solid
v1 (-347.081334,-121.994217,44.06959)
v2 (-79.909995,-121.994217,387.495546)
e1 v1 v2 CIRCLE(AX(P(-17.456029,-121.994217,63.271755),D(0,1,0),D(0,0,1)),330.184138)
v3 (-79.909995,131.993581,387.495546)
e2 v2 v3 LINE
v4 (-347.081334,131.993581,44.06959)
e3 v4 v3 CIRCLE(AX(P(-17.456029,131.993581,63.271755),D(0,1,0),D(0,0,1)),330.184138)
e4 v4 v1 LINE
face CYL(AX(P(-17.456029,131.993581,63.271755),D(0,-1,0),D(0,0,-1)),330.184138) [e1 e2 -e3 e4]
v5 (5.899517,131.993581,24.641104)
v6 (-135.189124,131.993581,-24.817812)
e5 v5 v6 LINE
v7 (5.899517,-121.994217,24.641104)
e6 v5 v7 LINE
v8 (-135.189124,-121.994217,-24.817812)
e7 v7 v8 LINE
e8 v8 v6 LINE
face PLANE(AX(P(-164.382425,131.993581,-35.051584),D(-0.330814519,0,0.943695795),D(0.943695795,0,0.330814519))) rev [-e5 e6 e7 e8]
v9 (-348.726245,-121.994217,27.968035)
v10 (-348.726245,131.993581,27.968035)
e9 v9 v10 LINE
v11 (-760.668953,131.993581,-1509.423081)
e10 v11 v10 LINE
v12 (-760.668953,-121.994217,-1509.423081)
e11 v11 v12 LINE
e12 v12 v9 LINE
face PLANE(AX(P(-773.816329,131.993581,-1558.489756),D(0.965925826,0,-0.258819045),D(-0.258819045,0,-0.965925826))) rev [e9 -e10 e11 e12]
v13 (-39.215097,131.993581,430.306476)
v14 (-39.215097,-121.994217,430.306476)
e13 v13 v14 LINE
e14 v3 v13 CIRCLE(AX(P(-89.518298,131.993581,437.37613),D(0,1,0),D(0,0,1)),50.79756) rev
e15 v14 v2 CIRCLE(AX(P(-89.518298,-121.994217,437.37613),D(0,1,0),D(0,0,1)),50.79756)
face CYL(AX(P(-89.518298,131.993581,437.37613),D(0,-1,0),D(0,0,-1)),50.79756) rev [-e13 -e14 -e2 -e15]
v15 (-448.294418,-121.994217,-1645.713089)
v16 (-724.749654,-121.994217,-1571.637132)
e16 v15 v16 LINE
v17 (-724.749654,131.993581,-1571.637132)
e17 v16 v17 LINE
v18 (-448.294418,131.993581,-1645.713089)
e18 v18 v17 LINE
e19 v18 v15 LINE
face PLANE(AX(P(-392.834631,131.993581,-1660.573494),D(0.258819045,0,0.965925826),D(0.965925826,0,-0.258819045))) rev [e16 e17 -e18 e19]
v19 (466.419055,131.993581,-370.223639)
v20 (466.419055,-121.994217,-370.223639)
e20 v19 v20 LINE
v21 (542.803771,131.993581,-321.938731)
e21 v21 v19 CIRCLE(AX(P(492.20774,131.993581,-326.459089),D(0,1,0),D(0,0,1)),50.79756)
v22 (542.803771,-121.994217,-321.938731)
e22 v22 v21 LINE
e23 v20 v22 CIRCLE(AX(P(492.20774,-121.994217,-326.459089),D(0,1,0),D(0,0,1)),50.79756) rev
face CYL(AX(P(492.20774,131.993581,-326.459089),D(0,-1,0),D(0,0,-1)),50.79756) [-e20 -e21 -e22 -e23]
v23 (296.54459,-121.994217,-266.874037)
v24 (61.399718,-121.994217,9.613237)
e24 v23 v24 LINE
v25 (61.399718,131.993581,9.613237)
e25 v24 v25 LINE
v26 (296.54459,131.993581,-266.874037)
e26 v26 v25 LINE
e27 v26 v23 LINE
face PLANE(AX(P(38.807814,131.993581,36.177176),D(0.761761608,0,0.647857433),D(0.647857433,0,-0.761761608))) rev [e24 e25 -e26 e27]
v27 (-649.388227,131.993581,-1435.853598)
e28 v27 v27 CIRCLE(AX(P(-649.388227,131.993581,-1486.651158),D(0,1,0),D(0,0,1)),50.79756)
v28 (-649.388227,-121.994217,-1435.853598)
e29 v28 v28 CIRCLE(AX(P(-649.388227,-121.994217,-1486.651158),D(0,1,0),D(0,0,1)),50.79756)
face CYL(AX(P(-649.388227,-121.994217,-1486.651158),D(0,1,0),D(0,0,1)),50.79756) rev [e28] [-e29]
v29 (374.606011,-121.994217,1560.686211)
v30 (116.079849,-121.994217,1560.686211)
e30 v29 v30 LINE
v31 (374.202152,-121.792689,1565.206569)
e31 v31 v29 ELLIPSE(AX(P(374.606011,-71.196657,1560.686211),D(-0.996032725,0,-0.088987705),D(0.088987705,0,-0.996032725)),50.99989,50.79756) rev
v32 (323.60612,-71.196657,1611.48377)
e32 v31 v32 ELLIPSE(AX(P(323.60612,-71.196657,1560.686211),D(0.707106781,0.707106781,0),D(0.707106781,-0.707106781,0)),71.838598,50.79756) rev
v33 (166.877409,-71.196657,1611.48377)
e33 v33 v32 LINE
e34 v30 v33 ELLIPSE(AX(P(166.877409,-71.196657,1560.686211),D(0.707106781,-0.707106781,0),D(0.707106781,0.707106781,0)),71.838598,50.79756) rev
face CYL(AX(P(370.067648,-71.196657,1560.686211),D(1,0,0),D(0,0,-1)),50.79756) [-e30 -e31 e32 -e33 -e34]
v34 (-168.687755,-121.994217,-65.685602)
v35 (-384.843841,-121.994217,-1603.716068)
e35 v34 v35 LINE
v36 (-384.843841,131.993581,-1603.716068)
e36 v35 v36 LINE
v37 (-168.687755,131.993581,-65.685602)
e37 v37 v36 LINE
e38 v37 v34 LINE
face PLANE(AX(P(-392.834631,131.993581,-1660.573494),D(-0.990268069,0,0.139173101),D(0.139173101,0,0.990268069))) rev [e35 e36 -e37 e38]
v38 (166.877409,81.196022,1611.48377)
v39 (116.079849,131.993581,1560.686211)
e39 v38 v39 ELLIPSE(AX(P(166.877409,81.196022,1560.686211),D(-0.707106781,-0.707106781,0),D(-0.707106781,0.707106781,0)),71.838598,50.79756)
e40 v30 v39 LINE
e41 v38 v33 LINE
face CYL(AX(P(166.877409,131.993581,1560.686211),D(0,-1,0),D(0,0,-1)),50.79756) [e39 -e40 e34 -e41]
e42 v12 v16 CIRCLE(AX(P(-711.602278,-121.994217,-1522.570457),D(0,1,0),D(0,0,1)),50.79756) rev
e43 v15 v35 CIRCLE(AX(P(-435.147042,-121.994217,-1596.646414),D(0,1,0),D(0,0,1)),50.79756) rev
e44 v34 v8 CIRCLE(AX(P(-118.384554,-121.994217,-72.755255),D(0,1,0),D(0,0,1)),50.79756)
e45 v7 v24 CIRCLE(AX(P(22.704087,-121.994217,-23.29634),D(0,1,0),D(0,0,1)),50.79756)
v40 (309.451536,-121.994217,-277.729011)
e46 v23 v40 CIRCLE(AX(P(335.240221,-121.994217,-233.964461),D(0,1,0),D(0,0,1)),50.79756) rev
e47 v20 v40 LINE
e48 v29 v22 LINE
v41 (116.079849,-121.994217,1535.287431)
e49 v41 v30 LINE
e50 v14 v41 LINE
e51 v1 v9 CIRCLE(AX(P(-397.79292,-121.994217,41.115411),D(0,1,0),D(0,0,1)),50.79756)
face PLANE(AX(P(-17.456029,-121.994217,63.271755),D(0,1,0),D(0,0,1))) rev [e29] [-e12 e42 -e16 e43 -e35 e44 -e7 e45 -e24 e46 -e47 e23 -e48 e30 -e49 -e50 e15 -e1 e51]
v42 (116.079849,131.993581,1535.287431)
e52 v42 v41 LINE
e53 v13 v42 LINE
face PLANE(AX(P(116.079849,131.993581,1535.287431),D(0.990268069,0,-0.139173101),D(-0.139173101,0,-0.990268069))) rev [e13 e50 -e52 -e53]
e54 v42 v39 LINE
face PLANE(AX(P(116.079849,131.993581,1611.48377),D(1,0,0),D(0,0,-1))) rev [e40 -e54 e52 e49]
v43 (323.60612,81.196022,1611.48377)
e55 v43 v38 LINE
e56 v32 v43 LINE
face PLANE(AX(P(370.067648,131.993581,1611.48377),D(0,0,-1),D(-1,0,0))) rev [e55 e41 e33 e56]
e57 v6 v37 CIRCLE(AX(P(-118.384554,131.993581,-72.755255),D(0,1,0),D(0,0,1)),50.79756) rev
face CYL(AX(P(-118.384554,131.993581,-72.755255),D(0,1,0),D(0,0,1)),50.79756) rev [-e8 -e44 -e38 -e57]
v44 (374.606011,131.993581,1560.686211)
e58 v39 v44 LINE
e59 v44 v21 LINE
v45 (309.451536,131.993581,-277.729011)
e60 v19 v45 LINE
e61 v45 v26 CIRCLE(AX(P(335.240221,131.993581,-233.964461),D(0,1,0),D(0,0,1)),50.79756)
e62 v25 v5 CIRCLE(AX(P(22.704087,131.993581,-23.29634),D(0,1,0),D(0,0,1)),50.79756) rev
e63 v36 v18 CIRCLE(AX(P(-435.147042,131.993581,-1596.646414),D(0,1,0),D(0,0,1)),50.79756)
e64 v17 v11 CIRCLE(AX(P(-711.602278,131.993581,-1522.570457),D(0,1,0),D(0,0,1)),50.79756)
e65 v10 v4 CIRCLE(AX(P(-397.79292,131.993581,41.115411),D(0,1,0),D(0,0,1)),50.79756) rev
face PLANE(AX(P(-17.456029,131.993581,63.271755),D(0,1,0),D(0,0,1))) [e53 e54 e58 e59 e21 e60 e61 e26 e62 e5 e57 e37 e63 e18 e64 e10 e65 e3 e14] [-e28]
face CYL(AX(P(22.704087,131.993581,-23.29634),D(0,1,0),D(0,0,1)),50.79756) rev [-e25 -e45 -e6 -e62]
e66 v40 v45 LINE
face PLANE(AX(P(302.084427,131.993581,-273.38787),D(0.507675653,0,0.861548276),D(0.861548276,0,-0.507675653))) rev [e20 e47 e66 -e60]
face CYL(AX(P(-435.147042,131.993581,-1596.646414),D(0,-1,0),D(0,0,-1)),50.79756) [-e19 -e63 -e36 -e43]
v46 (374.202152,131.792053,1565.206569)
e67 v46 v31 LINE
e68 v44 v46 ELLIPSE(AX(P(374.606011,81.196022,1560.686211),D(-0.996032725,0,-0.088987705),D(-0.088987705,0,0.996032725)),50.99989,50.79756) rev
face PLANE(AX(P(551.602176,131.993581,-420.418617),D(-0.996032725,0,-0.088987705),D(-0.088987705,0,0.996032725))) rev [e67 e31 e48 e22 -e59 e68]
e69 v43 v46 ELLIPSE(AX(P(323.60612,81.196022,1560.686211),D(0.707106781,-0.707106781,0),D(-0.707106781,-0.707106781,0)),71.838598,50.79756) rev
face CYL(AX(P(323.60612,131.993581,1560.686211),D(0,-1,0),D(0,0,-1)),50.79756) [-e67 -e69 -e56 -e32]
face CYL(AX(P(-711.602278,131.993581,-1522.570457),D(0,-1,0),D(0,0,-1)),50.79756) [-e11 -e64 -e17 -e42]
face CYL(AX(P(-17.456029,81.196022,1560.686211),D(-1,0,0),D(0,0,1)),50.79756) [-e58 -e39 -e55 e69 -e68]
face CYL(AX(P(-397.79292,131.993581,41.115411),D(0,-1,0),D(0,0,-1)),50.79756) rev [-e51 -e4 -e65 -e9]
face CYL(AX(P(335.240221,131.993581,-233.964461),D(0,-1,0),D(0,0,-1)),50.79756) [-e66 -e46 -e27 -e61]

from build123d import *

# Parameters (mm, degrees)
BOSS_EXTRUDE1_DEPTH = 10
SKETCH3_R           = 2
CUT_EXTRUDE1_DEPTH  = 115.049114878
FILLET1_R           = 2
SCALE1_OUTLINE_R    = 2
SCALE1_DEPTH        = 10
SCALE1_START        = -121.994217108
SCALE1_2_OUTLINE_R  = 50.797559682
SCALE1_2_DEPTH      = 253.987798408
SCALE1_START_2      = 115
SCALE1_3_DEPTH      = 259.606010788


with BuildPart() as part:
    # Sketch2 → Boss-Extrude1 (new body)
    with BuildSketch(Plane(origin=(0, 0, 0), x_dir=(1, 0, 0), z_dir=(0, 1, 0))):
        with BuildLine():
            Line((-34.878175659, 26.752034212), (-49.878175659, 22.732796325))
            Line((-49.878175659, 22.732796325), (-33.054937728, -40.052382384))
            ThreePointArc((-33.054937728, -40.052382384), (-30.014485308, -49.526217776), (-21.165547534, -54.075306501))
            Line((-21.165547534, -54.075306501), (-14.841209972, -99.075306501))
            Line((-14.841209972, -99.075306501), (-14.841209972, -102.075306501))
            Line((-14.841209972, -102.075306501), (-4.841209972, -102.075306501))
            Line((-4.841209972, -102.075306501), (2.306162059, -22.075306501))
            Line((2.306162059, -22.075306501), (-7.517843313, -27.864196663))
            Line((-7.517843313, -27.864196663), (-17.883562238, -40.052382384))
            Line((-17.883562238, -40.052382384), (-25.883562238, -37.247965788))
            Line((-25.883562238, -37.247965788), (-34.878175659, 26.752034212))
        make_face()
    extrude(amount=BOSS_EXTRUDE1_DEPTH)

    # Sketch3 → Cut-Extrude1 (cut, through all)
    with BuildSketch(Plane(origin=(0, 10, 0), x_dir=(1, 0, 0), z_dir=(0, 1, 0))):
        with Locations(Location((-44.979196174, 19.9043692, 0), (0, 0, 270))):
            Circle(SKETCH3_R)
    extrude(amount=-CUT_EXTRUDE1_DEPTH, mode=Mode.SUBTRACT)

    # Fillet1
    fillet1_edges = [part.edges().sort_by_distance(p)[0] for p in [
        (-9.841209972, 0, 102.075306501),
        (-25.883562238, 5, 37.247965788),
        (-17.883562238, 5, 40.052382384),
        (-7.517843313, 5, 27.864196663),
        (2.306162059, 5, 22.075306501),
        (-4.841209972, 5, 102.075306501),
        (-14.841209972, 5, 102.075306501),
        (-21.165547534, 5, 54.075306501),
        (-33.054937728, 5, 40.052382384),
        (-49.878175659, 5, -22.732796325),
        (-34.878175659, 5, -26.752034212),
        (-9.841209972, 10, 102.075306501),
    ]]
    fillet(fillet1_edges, radius=FILLET1_R)

    # Scale1: read off the stored shape, not the designer's step
    # Scale1 outline → Scale1 (cut)
    with BuildSketch(Plane(origin=(0, 0, 0), x_dir=(1, 0, 0), z_dir=(0, 1, 0))):
        with BuildLine():
            Line((-49.360537569, 20.800944672), (-41.650784025, -7.972247266))
            Line((-41.650784025, -7.972247266), (-29.394150026, -12.26883574))
            Line((-29.394150026, -12.26883574), (-34.56356251, 24.513445333))
            ThreePointArc((-34.56356251, 24.513445333), (-35.440224677, 25.902870776), (-37.061736738, 26.166950784))
            Line((-37.061736738, 26.166950784), (-47.946324007, 23.250434415))
            ThreePointArc((-47.946324007, 23.250434415), (-49.160736724, 22.318582762), (-49.360537569, 20.800944672))
        make_face()
        with Locations((-44.979196174, 19.9043692)):
            Circle(SCALE1_OUTLINE_R, mode=Mode.SUBTRACT)
    extrude(amount=SCALE1_DEPTH, mode=Mode.SUBTRACT)

    # Scale1 2 outline → Scale1 2 (add)
    with BuildSketch(Plane(origin=(0, 0, 0), x_dir=(1, 0, 0), z_dir=(0, 1, 0)).offset(SCALE1_START)):
        with BuildLine():
            Line((-168.687755361, 65.685601537), (-384.843840888, 1603.716067804))
            ThreePointArc((-384.843840888, 1603.716067804), (-407.109990259, 1639.005778716), (-448.294418101, 1645.713088711))
            Line((-448.294418101, 1645.713088711), (-724.74965381, 1571.637131559))
            ThreePointArc((-724.74965381, 1571.637131559), (-755.594255054, 1547.969236591), (-760.668952729, 1509.42308086))
            Line((-760.668952729, 1509.42308086), (-348.726244774, -27.968035036))
            ThreePointArc((-348.726244774, -27.968035036), (-347.258373754, -35.952877877), (-347.081334171, -44.069590112))
            ThreePointArc((-347.081334171, -44.069590112), (-278.064712008, -266.014644418), (-79.909995387, -387.4955464))
            ThreePointArc((-79.909995387, -387.4955464), (-52.700625622, -402.378257255), (-39.215096586, -430.306475817))
            Line((-39.215096586, -430.306475817), (116.079849164, -1535.287430848))
            Line((116.079849164, -1535.287430848), (116.079849164, -1560.686210689))
            ThreePointArc((116.079849164, -1560.686210689), (130.958109927, -1596.605509607), (166.877408846, -1611.48377037))
            Line((166.877408846, -1611.48377037), (323.606120492, -1611.48377037))
            ThreePointArc((323.606120492, -1611.48377037), (357.890000816, -1598.169641955), (374.202152259, -1565.206568967))
            Line((374.202152259, -1565.206568967), (542.803771441, 321.938731014))
            ThreePointArc((542.803771441, 321.938731014), (519.350127439, 369.397217524), (466.419055413, 370.223639258))
            Line((466.419055413, 370.223639258), (309.451536343, 277.729010804))
            ThreePointArc((309.451536343, 277.729010804), (302.544435993, 272.840902782), (296.544589882, 266.874037447))
            Line((296.544589882, 266.874037447), (61.399717742, -9.613236968))
            ThreePointArc((61.399717742, -9.613236968), (35.980525842, -25.735570803), (5.899516763, -24.641103846))
            Line((5.899516763, -24.641103846), (-135.189124295, 24.817811952))
            ThreePointArc((-135.189124295, 24.817811952), (-157.670776916, 40.553007666), (-168.687755361, 65.685601537))
        make_face()
        with Locations((-649.388227221, 1486.651157832)):
            Circle(SCALE1_2_OUTLINE_R, mode=Mode.SUBTRACT)
    extrude(amount=SCALE1_2_DEPTH)

    # Scale1 3 outline → Scale1 3 (cut)
    with BuildSketch(Plane.YZ.offset(SCALE1_START_2)):
        with BuildLine():
            Line((131.9935813, 1611.48377037), (81.196021618, 1611.48377037))
            ThreePointArc((81.196021618, 1611.48377037), (117.115320537, 1596.605509607), (131.9935813, 1560.686210689))
            Line((131.9935813, 1560.686210689), (131.9935813, 1611.48377037))
        make_face()
        with BuildLine():
            ThreePointArc((-121.994217108, 1560.686210689), (-107.115956345, 1596.605509607), (-71.196657426, 1611.48377037))
            Line((-71.196657426, 1611.48377037), (-121.994217108, 1611.48377037))
            Line((-121.994217108, 1611.48377037), (-121.994217108, 1560.686210689))
        make_face()
    extrude(amount=SCALE1_3_DEPTH, mode=Mode.SUBTRACT)


solid = part.part
